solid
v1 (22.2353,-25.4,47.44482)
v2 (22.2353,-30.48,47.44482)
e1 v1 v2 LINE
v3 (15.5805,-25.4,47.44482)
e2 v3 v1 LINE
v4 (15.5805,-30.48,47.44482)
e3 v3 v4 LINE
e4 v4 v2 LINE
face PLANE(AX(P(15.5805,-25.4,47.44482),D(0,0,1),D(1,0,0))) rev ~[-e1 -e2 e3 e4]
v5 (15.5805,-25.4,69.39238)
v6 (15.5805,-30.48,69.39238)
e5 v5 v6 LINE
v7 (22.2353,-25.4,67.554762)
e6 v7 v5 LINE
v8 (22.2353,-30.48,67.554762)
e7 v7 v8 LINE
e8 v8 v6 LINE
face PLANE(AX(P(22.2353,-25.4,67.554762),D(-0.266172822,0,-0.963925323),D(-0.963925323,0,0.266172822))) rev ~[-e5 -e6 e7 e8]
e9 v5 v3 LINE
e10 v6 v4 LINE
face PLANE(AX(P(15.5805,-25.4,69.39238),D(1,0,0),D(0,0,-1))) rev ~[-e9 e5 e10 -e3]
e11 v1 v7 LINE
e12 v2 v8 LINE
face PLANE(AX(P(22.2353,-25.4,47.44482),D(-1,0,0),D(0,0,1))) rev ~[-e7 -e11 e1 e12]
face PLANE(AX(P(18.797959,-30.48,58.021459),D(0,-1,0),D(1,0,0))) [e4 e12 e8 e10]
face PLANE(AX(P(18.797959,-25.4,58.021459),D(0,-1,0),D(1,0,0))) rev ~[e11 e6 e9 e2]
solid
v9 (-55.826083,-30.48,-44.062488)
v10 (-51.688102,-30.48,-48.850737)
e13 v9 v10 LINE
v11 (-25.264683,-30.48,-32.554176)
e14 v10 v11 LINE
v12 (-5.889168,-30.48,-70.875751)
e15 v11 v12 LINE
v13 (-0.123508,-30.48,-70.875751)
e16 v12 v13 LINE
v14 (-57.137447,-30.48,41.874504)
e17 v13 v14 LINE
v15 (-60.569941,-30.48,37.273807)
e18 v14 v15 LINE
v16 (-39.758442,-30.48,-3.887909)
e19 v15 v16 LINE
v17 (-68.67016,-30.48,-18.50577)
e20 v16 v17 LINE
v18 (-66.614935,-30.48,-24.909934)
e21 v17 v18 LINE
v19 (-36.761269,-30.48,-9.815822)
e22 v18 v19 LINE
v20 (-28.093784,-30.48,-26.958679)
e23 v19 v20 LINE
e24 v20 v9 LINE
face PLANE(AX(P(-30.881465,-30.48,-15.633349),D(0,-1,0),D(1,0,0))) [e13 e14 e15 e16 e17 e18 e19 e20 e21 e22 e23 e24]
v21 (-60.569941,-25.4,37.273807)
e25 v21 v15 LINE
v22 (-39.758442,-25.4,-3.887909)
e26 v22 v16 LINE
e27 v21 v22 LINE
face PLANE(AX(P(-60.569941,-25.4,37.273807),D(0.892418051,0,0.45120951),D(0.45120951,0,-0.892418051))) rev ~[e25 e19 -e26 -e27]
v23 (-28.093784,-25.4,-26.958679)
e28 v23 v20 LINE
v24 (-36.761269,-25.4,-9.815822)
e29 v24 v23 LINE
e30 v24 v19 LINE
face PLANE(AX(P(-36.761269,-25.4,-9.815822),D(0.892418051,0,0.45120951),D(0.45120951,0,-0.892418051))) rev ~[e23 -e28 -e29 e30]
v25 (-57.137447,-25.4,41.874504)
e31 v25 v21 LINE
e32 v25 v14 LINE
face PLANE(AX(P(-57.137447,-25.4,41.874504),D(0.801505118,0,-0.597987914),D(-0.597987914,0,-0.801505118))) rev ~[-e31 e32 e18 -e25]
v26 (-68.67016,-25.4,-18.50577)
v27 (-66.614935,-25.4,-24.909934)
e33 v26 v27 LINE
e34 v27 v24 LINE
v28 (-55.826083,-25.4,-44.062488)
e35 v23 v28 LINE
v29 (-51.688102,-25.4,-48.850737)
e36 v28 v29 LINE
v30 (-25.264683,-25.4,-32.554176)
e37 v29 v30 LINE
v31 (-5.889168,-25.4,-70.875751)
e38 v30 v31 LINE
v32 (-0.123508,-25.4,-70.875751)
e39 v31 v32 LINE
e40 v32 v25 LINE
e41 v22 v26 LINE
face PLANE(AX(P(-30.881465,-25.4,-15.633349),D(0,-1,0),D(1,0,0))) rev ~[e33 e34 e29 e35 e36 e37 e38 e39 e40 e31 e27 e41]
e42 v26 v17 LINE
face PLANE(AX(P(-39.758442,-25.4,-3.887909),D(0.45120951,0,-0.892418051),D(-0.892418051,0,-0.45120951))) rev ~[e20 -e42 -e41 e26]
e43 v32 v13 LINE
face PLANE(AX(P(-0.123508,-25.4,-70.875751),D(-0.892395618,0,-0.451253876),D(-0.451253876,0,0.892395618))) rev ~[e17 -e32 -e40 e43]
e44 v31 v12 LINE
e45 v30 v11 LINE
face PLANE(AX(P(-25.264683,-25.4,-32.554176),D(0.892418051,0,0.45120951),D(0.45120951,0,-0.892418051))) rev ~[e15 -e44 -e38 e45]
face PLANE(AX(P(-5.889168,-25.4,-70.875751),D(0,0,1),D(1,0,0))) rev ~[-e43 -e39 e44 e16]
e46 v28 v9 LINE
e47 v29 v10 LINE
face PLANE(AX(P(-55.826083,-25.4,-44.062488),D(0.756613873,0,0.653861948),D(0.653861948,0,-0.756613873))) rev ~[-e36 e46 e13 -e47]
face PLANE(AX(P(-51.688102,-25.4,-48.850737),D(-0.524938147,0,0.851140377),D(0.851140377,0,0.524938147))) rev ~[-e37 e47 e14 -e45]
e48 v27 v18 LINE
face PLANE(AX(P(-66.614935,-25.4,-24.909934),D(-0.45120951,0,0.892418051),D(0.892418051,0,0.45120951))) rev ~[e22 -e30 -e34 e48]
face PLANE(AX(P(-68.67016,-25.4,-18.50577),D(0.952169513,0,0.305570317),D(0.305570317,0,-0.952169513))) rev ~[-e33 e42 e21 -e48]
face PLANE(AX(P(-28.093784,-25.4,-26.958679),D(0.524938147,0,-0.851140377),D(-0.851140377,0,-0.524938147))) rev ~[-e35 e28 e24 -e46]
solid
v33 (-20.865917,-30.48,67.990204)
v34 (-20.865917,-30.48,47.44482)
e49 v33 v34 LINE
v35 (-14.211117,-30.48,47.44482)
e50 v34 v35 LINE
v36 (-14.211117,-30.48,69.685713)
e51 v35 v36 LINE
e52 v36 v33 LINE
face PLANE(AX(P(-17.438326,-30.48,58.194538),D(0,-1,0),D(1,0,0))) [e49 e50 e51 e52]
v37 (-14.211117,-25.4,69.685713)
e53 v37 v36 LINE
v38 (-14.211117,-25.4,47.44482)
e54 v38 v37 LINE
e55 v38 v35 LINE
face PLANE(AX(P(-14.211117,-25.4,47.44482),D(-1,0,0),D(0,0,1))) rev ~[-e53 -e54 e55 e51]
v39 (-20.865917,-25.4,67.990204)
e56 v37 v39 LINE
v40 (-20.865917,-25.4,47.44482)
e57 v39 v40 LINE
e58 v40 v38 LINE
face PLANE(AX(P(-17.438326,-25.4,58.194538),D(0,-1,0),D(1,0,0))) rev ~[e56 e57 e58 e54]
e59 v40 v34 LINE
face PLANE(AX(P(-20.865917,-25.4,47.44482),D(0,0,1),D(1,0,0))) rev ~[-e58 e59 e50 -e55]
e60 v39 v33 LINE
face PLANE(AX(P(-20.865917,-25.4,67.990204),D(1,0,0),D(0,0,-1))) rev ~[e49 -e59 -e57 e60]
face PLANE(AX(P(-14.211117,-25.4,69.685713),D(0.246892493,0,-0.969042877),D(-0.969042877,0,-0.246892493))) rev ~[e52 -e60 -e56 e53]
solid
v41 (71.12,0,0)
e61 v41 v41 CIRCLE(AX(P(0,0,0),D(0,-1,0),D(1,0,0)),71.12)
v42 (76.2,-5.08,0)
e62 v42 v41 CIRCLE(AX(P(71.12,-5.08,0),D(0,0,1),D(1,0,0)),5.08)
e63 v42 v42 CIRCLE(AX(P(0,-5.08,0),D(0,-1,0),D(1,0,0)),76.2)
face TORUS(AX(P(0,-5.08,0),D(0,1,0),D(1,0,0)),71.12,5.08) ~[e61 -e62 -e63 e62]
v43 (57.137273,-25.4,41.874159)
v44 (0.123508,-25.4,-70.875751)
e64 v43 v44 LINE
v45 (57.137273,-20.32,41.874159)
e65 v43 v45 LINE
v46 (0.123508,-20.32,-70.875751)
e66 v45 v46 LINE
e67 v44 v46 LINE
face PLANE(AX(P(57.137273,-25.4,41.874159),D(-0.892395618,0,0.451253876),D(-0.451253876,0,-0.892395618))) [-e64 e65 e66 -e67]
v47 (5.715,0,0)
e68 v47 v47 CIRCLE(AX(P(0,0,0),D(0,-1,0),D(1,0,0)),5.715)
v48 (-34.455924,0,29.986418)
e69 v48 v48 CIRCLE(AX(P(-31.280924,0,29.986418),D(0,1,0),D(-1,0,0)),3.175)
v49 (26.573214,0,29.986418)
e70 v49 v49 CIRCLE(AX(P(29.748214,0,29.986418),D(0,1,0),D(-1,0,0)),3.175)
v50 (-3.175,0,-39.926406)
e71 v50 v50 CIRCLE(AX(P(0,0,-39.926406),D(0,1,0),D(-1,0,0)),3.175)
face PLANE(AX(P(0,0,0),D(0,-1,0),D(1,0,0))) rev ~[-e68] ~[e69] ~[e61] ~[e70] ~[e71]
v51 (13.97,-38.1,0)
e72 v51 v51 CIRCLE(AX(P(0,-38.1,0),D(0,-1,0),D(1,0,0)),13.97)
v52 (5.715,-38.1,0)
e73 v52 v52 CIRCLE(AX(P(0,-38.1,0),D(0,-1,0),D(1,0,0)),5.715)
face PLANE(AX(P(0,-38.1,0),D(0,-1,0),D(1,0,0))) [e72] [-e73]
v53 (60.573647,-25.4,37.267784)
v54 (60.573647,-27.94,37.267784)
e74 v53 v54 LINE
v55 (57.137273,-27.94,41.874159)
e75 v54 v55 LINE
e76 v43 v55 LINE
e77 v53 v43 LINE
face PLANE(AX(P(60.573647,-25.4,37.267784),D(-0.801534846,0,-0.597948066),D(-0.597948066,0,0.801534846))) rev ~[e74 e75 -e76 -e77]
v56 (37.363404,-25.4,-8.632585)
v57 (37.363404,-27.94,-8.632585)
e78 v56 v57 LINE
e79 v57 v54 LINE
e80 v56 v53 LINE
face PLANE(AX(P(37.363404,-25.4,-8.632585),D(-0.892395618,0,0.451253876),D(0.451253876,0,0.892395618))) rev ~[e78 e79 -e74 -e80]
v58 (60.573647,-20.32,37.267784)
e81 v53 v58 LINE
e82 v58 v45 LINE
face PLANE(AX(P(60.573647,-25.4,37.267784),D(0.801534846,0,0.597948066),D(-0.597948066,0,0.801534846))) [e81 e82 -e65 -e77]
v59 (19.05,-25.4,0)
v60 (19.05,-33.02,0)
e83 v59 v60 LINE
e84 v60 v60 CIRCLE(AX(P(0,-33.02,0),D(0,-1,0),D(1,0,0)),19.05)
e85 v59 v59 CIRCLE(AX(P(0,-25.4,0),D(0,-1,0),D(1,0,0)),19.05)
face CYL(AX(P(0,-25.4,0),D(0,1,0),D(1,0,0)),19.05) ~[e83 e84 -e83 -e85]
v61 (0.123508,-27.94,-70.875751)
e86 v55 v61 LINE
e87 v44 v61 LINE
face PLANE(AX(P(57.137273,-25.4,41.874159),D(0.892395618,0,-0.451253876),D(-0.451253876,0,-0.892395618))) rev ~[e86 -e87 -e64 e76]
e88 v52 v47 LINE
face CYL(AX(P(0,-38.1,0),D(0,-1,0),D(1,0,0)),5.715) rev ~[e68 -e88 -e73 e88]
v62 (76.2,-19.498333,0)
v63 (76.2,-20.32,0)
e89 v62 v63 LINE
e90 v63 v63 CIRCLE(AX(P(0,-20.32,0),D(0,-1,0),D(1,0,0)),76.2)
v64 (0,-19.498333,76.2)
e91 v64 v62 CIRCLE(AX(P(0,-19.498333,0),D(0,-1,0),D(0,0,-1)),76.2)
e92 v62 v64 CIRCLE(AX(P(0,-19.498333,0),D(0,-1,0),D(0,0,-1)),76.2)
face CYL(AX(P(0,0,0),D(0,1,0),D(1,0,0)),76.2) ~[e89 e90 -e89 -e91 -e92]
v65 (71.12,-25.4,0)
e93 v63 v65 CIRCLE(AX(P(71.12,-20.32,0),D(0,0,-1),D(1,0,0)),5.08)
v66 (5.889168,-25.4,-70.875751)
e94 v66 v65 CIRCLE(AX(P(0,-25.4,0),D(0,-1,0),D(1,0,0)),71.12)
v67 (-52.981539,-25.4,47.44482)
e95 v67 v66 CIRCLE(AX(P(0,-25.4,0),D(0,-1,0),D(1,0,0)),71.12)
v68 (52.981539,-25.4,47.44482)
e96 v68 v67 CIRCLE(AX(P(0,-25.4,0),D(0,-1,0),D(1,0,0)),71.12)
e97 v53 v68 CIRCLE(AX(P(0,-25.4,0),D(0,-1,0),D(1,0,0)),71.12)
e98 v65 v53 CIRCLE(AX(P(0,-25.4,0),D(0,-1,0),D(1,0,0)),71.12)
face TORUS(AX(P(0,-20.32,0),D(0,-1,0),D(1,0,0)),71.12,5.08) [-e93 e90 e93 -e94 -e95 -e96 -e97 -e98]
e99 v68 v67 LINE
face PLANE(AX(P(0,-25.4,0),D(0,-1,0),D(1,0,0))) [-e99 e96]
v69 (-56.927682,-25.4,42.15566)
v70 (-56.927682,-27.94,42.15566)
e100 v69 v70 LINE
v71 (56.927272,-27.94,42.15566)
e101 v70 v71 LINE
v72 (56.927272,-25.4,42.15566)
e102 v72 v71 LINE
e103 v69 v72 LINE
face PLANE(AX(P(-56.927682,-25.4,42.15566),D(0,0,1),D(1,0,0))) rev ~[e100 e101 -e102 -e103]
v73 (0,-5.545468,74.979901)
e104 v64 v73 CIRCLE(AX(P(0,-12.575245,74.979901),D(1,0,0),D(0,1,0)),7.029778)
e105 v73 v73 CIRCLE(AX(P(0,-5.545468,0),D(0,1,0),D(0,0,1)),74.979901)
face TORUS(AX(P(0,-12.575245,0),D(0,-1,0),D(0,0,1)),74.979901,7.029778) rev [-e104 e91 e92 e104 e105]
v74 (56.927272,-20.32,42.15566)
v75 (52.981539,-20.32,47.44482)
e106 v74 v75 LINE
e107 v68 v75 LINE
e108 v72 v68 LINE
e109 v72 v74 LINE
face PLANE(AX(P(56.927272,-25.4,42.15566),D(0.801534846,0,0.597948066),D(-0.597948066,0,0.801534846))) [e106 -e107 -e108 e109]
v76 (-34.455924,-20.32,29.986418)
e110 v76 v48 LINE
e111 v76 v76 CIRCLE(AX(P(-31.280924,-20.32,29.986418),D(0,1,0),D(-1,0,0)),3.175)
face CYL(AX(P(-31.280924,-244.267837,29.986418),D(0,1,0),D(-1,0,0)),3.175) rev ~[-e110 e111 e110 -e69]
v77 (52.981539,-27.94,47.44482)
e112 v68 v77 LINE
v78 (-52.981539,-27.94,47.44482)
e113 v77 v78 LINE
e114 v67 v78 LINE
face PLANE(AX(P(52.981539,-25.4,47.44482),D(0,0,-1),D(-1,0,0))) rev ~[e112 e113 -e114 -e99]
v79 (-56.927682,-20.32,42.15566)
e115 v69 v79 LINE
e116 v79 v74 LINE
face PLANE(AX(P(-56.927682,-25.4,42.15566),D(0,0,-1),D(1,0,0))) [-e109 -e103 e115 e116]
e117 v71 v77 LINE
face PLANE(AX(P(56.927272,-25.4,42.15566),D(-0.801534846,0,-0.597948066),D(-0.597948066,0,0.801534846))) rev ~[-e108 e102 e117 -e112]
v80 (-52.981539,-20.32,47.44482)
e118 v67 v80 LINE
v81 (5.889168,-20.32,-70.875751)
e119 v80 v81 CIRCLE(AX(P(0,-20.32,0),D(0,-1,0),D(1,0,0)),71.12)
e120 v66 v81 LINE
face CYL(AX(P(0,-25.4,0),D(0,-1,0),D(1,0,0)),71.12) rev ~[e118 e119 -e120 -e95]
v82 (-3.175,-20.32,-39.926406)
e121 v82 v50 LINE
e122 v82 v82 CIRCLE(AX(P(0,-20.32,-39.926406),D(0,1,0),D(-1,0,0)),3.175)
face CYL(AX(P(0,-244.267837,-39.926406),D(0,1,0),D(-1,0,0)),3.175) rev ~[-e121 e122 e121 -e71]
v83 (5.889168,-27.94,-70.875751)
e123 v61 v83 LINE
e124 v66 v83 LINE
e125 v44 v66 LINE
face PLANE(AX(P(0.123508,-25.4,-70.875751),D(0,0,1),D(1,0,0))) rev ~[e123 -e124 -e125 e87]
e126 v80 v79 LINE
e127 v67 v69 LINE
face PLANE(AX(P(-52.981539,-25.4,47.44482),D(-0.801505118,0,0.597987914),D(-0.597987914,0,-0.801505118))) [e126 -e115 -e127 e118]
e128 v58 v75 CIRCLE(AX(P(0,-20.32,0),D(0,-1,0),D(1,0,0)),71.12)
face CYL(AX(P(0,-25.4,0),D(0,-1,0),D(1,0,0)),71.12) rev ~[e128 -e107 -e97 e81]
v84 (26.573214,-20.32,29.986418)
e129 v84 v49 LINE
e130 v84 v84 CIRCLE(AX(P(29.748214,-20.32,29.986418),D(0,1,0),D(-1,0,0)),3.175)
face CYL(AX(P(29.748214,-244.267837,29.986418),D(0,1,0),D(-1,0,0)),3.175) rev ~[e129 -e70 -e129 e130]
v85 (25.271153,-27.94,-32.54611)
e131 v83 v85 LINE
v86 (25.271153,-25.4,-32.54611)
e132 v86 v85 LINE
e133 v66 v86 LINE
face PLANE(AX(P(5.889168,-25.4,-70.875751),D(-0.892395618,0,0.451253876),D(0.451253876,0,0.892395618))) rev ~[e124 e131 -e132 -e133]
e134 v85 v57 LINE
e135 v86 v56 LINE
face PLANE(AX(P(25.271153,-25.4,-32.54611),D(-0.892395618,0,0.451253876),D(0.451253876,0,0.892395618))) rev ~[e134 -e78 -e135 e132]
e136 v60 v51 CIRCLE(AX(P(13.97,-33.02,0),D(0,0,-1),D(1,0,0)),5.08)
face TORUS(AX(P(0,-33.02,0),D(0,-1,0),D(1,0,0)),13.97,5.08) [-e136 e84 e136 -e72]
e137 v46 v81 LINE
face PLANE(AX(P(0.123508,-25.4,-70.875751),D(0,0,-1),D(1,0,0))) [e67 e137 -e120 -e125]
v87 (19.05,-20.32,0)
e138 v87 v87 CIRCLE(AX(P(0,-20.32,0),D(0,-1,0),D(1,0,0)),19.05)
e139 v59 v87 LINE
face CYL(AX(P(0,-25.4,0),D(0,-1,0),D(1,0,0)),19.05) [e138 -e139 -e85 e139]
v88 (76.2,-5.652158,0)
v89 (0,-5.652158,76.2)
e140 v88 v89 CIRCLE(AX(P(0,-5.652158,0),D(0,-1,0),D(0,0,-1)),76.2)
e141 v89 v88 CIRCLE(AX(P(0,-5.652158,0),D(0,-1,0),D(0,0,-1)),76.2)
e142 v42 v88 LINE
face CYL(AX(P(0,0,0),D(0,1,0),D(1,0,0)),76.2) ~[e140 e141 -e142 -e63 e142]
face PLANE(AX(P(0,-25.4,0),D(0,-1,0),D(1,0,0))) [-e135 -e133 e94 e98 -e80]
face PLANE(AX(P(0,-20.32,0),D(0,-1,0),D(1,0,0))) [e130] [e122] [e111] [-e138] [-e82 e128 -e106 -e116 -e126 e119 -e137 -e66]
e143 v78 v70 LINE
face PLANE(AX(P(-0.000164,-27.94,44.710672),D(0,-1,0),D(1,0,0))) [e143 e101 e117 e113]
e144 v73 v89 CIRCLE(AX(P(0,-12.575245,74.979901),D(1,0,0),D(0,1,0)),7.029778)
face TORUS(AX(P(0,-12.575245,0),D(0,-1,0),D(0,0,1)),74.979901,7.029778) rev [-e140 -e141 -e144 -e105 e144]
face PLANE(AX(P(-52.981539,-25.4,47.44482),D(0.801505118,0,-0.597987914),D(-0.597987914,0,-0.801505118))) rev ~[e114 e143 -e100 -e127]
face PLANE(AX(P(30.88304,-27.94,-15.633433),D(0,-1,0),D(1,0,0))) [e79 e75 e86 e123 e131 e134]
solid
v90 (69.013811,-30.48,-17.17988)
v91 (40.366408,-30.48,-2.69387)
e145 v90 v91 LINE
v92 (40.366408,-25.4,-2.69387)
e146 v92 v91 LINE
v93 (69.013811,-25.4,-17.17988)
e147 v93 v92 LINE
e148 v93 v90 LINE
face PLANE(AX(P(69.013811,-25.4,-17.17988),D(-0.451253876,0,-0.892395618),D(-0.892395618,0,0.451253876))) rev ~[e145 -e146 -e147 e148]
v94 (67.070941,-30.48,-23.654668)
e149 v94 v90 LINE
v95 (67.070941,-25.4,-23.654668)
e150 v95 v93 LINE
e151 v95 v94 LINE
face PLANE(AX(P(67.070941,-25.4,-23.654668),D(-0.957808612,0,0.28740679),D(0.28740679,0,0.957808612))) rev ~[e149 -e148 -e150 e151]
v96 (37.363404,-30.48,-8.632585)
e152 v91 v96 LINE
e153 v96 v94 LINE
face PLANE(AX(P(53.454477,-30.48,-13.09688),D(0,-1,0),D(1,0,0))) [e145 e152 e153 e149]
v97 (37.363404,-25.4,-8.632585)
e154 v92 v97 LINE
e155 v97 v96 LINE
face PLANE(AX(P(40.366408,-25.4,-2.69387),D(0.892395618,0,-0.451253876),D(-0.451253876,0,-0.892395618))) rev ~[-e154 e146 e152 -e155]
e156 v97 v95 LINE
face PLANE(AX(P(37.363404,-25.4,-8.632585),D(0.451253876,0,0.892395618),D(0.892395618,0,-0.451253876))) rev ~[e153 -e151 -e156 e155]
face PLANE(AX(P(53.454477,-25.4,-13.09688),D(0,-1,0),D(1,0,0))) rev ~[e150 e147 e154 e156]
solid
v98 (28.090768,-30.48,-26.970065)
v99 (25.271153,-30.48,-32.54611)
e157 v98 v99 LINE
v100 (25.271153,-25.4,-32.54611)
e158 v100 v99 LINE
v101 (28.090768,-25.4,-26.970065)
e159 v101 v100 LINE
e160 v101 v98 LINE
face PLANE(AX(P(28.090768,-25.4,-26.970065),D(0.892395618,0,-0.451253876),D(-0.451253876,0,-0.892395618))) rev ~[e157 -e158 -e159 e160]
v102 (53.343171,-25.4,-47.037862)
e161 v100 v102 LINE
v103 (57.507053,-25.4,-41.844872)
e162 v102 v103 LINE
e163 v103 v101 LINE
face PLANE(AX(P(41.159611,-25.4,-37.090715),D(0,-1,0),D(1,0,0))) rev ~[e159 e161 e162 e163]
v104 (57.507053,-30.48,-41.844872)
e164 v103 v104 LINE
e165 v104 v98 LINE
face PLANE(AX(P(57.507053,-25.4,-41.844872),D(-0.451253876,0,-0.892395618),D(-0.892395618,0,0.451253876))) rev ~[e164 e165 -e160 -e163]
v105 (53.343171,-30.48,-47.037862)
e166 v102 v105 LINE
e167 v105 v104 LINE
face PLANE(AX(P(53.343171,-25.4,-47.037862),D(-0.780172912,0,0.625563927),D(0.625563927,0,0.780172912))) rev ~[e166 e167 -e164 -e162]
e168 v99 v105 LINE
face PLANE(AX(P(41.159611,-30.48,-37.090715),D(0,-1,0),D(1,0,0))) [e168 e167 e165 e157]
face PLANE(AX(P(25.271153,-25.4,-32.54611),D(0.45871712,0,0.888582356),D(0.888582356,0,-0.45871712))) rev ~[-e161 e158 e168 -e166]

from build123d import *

# Parameters (mm, degrees)
F0_R      = 76.2
F1_DEPTH  = 25.4
F2_R      = 19.05
F3_DEPTH  = 12.7
F4_R      = 5.08
F5_R      = 5.715
F6_DEPTH  = 76.2
F7_R      = 5.08
F8_R      = 7.0297777753
F11_D     = 6.35
F13_DEPTH = 2.54
F14_DEPTH = 5.08
F17_DEPTH = 5.08


# Not quite as in the source:
# - a feature names something its author has since deleted; it is built from what else it names
# - the program builds the solid bodies; features that only make, move or delete a surface that nothing else refers to are left out


with BuildPart() as f1:
    # F0 (on Front) → F1 (new body)
    with BuildSketch(Plane.XZ):
        Circle(F0_R)
    extrude(amount=F1_DEPTH)

    # F2 (on face) → F3 (join)
    with BuildSketch(Plane.XZ.offset(25.4)):
        Circle(F2_R)
    extrude(amount=F3_DEPTH)

    # F4
    f4_edges = [f1.edges().sort_by_distance(p)[0] for p in [
        (-76.2, -25.4, 0),
        (-76.2, 0, 0),
    ]]
    fillet(f4_edges, radius=F4_R)

    # F5 (on face) → F6 (cut)
    with BuildSketch(Plane.XZ.offset(38.1)):
        Circle(F5_R)
    extrude(amount=-F6_DEPTH, mode=Mode.SUBTRACT)

    # F7
    f7_edges = [f1.edges().sort_by_distance(p)[0] for p in [
        (-19.05, -38.1, 0),
    ]]
    fillet(f7_edges, radius=F7_R)

    # F8 (on Right) → F9 (revolve, cut)
    with BuildSketch(Plane.YZ):
        with Locations((-12.5752454624, 74.9799013138)):
            Circle(F8_R)
    revolve(axis=Axis((0, 0, 0), (0, 1, 0)), mode=Mode.SUBTRACT)

    # F11 (through all)
    with Locations(Plane.XZ.offset(25.4)):
        with Locations((-31.2809236348, 29.9864178827), (0, -39.9264059961), (29.7482135823, 29.9864178827)):
            Hole(F11_D / 2)

    # F12 (on face) → F13 (join)
    with BuildSketch(Plane.XZ.offset(25.4)):
        Polygon((60.5736467116, 37.2677839972), (57.137273224, 41.8741591157), (0.1235082642, -70.8757511643), (5.8891677589, -70.8757511643), (25.271153487, -32.5461100077), (28.0907682056, -26.9700652268), (37.3634036013, -8.6325846262), (40.3664078951, -2.693870266), align=None)
        Polygon((-52.9815390901, 47.4448196924), (-56.9276816511, 42.155660184), (56.9272723486, 42.155660184), (52.9815390901, 47.4448196924), (22.2352999541, 47.4448196924), (15.5804999541, 47.4448196924), (-14.2111172058, 47.4448196924), (-20.8659172058, 47.4448196924), align=None)
    extrude(amount=F13_DEPTH)

    # F17 (cut): a face of the model
    f17_faces = [f1.faces().sort_by_distance(p)[0] for p in [
        (58.9974941885, -25.4, 39.6769296293),
    ]]
    extrude(f17_faces, amount=-F17_DEPTH, mode=Mode.SUBTRACT)


with BuildPart() as f14:
    # F12 (on face) → F14 (new body)
    with BuildSketch(Plane.XZ.offset(25.4)):
        Polygon((-0.1235082642, -70.8757511643), (-57.1374473692, 41.8745035037), (-60.5699408845, 37.2738066374), (-39.7584415253, -3.8879093412), (-36.761269241, -9.8158221829), (-28.0937840544, -26.9586794726), (-25.2646825431, -32.5541760235), (-5.8891677589, -70.8757511643), align=None)
        Polygon((-36.761269241, -9.8158221829), (-39.7584415253, -3.8879093412), (-68.6701601192, -18.5057696195), (-66.6149351284, -24.9099341196), align=None)
        Polygon((-51.6881021847, -48.850736868), (-25.2646825431, -32.5541760235), (-28.0937840544, -26.9586794726), (-55.8260833114, -44.0624876976), align=None)
    extrude(amount=F14_DEPTH)


with BuildPart() as f14b:
    # F12 (on face) → F14, piece 2 (new body)
    with BuildSketch(Plane.XZ.offset(25.4)):
        Polygon((28.0907682056, -26.9700652268), (25.271153487, -32.5461100077), (53.3431713755, -47.0378620646), (57.5070525493, -41.8448719331), align=None)
    extrude(amount=F14_DEPTH)


with BuildPart() as f14c:
    # F12 (on face) → F14, piece 3 (new body)
    with BuildSketch(Plane.XZ.offset(25.4)):
        Polygon((69.0138110743, -17.1798801219), (40.3664078951, -2.693870266), (37.3634036013, -8.6325846262), (67.0709407107, -23.6546678729), align=None)
    extrude(amount=F14_DEPTH)


with BuildPart() as f14d:
    # F12 (on face) → F14, piece 4 (new body)
    with BuildSketch(Plane.XZ.offset(25.4)):
        Polygon((15.5804999541, 47.4448196924), (22.2352999541, 47.4448196924), (22.2352999541, 67.5547617563), (15.5804999541, 69.3923801377), align=None)
    extrude(amount=F14_DEPTH)


with BuildPart() as f14e:
    # F12 (on face) → F14, piece 5 (new body)
    with BuildSketch(Plane.XZ.offset(25.4)):
        Polygon((-20.8659172058, 67.9902044353), (-20.8659172058, 47.4448196924), (-14.2111172058, 47.4448196924), (-14.2111172058, 69.6857126516), align=None)
    extrude(amount=F14_DEPTH)


solid = Compound([f1.part, f14.part, f14b.part, f14c.part, f14d.part, f14e.part])
